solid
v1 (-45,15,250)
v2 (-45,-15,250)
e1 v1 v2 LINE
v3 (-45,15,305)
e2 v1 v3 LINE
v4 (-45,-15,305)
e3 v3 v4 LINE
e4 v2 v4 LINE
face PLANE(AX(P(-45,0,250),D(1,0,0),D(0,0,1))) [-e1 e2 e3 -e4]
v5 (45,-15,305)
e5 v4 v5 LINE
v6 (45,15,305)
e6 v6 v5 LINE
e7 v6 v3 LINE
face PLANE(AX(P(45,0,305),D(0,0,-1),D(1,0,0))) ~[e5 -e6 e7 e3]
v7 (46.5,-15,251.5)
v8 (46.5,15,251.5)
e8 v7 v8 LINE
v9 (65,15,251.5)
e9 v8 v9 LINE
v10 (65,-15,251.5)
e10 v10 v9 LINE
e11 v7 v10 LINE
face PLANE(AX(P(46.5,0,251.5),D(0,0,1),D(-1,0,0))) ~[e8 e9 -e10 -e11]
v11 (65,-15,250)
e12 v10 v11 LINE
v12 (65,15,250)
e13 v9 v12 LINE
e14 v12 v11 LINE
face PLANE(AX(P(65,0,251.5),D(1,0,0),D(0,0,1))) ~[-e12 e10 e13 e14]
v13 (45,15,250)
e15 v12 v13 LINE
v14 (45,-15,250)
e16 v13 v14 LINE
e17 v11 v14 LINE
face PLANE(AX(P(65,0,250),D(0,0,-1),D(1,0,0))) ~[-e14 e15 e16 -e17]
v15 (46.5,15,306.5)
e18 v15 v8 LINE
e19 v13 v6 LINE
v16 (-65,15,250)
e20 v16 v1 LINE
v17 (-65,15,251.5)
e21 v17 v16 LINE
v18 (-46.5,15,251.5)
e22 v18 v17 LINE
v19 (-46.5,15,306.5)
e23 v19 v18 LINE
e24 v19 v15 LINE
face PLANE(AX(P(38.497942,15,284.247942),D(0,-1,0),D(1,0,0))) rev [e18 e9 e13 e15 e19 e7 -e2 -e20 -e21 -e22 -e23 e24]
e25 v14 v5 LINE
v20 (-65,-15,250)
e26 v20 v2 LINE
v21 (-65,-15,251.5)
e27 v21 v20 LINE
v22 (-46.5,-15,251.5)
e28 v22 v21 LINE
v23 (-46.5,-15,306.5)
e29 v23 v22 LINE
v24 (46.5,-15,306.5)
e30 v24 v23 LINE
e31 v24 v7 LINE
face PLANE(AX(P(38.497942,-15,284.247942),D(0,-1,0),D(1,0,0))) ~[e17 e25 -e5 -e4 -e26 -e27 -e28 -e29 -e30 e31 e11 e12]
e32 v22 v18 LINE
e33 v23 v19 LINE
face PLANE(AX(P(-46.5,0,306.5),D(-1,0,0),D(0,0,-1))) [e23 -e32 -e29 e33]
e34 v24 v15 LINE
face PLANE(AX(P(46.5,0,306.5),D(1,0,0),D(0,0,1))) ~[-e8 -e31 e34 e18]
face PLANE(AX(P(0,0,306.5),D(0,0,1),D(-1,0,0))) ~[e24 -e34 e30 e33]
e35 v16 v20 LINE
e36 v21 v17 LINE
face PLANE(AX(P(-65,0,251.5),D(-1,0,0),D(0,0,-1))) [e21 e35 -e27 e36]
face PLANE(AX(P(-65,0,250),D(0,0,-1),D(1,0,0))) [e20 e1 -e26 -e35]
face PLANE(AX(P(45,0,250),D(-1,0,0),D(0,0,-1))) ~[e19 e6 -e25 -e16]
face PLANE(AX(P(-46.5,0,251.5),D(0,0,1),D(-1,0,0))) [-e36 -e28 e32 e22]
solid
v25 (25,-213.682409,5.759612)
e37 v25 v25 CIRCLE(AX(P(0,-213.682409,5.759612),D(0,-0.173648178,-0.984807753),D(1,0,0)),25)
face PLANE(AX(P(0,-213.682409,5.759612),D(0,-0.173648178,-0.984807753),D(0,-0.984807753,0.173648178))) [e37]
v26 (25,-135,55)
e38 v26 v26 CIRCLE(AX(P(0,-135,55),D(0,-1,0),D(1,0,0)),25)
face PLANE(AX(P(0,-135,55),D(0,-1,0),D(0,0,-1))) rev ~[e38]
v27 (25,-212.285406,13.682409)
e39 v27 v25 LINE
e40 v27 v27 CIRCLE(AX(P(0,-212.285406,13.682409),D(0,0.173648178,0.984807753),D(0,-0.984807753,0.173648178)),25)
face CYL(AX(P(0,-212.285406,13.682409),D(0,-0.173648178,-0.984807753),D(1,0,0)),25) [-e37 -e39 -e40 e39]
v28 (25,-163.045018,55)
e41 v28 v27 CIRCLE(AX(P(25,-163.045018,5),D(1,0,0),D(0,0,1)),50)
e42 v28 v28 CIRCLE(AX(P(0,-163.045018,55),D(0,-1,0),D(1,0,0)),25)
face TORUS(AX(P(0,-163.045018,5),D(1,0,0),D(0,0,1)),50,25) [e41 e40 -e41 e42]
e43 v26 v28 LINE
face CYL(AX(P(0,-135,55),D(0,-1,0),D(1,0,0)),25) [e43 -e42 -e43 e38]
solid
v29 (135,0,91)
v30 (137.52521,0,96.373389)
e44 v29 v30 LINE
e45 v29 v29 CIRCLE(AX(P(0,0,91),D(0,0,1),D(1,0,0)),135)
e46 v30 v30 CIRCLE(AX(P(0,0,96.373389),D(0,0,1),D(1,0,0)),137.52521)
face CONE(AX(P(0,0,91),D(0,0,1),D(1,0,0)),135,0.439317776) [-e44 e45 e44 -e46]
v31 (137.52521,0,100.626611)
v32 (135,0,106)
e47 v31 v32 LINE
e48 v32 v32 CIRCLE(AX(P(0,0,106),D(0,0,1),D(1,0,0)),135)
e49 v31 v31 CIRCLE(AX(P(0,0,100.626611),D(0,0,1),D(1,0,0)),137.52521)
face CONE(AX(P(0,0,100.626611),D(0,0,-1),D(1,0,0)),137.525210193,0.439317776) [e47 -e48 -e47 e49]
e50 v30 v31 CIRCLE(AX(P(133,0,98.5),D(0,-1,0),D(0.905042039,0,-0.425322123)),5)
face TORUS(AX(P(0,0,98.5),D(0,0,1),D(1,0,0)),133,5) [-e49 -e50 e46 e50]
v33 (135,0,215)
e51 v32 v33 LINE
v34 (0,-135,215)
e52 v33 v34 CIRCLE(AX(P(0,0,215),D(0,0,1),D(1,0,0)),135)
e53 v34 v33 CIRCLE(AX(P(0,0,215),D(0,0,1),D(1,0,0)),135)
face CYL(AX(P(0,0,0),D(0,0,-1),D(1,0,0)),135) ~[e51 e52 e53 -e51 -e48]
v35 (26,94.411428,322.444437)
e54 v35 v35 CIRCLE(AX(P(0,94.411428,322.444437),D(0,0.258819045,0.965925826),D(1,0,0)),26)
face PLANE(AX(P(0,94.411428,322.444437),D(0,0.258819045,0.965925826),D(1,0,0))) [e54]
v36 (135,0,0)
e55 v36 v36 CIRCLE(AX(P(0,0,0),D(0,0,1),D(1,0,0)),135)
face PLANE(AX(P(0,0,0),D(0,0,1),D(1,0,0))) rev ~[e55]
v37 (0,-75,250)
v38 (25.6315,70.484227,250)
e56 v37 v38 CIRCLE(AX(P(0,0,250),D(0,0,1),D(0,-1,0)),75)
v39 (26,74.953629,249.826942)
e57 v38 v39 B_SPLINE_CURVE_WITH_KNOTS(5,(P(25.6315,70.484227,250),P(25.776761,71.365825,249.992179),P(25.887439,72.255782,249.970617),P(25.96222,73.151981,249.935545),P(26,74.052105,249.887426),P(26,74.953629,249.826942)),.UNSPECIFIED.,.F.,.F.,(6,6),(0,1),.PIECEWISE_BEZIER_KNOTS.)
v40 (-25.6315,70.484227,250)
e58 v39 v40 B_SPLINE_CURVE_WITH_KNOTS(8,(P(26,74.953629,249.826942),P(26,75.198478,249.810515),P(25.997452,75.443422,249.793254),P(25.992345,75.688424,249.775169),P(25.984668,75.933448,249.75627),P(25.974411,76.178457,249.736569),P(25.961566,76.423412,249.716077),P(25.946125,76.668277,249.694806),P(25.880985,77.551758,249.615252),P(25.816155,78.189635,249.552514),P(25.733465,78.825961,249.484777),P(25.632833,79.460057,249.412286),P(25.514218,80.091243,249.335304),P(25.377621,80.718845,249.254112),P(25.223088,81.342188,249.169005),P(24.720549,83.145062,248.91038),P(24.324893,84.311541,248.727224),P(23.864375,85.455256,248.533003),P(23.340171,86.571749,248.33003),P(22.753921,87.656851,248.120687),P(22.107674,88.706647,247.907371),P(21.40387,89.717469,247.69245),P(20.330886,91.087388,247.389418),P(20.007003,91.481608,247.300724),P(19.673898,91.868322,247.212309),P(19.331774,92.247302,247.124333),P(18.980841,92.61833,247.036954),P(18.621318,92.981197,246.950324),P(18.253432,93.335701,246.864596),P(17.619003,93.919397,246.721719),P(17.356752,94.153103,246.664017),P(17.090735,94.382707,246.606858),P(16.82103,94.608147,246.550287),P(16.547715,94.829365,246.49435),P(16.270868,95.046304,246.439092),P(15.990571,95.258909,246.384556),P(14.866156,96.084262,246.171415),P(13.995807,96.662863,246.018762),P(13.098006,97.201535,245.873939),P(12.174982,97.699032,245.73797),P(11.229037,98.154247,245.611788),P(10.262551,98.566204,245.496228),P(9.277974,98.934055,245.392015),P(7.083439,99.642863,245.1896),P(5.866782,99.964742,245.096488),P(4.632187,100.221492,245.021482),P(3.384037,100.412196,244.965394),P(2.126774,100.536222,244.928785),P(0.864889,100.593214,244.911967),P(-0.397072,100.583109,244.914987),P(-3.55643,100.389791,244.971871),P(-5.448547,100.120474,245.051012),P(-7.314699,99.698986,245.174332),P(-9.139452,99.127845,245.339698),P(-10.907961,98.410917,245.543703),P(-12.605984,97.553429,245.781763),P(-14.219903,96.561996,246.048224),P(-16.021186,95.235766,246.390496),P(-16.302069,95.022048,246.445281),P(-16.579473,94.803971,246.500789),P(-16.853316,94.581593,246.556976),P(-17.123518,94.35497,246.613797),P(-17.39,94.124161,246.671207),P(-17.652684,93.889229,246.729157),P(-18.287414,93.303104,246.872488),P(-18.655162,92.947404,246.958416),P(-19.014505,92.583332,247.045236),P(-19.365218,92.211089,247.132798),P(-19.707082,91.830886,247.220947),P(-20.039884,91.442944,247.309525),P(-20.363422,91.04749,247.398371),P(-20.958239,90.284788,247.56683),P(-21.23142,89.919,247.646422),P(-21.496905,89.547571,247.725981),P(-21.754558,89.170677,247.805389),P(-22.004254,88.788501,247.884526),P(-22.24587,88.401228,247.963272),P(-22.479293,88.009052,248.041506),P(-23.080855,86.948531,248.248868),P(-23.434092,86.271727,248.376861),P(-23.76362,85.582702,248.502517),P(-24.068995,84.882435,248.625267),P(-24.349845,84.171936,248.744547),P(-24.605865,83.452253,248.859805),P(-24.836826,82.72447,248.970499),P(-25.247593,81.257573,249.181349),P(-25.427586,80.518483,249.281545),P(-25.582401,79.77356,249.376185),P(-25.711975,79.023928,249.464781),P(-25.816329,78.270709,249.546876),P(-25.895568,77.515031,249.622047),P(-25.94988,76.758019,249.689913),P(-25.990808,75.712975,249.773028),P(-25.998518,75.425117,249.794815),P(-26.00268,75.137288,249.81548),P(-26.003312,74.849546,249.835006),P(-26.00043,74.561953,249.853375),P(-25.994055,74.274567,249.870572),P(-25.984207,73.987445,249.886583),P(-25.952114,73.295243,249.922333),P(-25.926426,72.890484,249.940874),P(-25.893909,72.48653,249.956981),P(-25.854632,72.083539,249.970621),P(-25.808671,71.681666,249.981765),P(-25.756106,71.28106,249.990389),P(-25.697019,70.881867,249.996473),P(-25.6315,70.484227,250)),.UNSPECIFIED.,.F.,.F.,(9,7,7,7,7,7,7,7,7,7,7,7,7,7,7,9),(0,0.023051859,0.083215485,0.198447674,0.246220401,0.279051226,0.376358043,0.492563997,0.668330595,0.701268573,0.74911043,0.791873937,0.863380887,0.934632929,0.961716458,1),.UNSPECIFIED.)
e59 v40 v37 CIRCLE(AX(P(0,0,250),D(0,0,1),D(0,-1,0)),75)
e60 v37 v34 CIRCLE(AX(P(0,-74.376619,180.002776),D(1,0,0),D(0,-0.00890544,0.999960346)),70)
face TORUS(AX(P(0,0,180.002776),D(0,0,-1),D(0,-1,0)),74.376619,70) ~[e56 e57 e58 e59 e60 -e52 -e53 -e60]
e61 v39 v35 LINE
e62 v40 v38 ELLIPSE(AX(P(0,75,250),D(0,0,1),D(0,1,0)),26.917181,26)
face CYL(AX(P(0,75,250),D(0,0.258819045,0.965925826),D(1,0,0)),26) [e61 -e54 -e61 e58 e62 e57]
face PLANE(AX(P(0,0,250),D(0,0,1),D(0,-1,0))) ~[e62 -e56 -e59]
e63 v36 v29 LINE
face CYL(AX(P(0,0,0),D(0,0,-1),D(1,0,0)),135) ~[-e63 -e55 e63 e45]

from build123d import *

# Parameters (mm, degrees)
F0_R      = 135
F1_DEPTH  = 215
F5_DEPTH  = 15
F10_R     = 26
F11_DEPTH = 75
F13_R     = 25


with BuildPart() as f1:
    # F0 (on Top) → F1 (new body)
    with BuildSketch(Plane.XY):
        Circle(F0_R)
    extrude(amount=F1_DEPTH)

    # F2 (on Right) → F3 (revolve)
    with BuildSketch(Plane.YZ):
        with BuildLine():
            ThreePointArc((-75, 250), (-109.6475910005, 240.467298858), (-135, 215))
            Line((-135, 215), (0, 215))
            Line((0, 215), (0, 250))
            Line((0, 250), (-75, 250))
        make_face()
    revolve(axis=Axis((0, 0, 232.5), (0, 0, 1)))

    # F10 (on face) → F11 (join, symmetric)
    with BuildSketch(Plane(origin=(0, 67.5240473581, 252.0031754731), x_dir=(1, 0, 0), z_dir=(0, 0.2588190451, 0.9659258263))):
        with Locations((0, 7.739675696)):
            Circle(F10_R)
    extrude(amount=F11_DEPTH, both=True)

    # F16 (on Front) → F17 (revolve)
    with BuildSketch(Plane.XZ):
        with BuildLine():
            Line((137.5252101931, 100.6266106152), (135, 106))
            Line((135, 106), (135, 91))
            Line((135, 91), (137.5252101931, 96.3733893848))
            ThreePointArc((137.5252101931, 96.3733893848), (138, 98.5), (137.5252101931, 100.6266106152))
        make_face()
    revolve(axis=Axis((0, 0, 0), (0, 0, 1)))


with BuildPart() as f5:
    # F4 (on Front) → F5 (new body, symmetric)
    with BuildSketch(Plane.XZ):
        Polygon((-65, 251.5), (-65, 250), (-45, 250), (-45, 305), (0, 305), (0, 306.5), (-46.5, 306.5), (-46.5, 251.5), align=None)
    extrude(amount=F5_DEPTH, both=True)

    # F6: F5 across plane


with BuildPart() as f5_1:
    add(f5.part)
    add(f5.part.mirror(Plane.YZ))


with BuildPart() as f15:
    # F15: sweep along a path in F14
    with BuildLine(Plane.YZ) as f15_path:
        Line((-135, 55), (-163.0450184411, 55))
        ThreePointArc((-163.0450184411, 55), (-195.1843989255, 43.3022221559), (-212.2854060917, 13.6824088833))
        Line((-212.2854060917, 13.6824088833), (-213.6824088833, 5.7596123494))
    # F13 (on offset) → F15 (sweep)
    with BuildSketch(Plane.XZ.offset(135)):
        with Locations((0, 55)):
            Circle(F13_R)
    sweep(path=f15_path.line)


solid = Compound([f1.part, f5_1.part, f15.part])
